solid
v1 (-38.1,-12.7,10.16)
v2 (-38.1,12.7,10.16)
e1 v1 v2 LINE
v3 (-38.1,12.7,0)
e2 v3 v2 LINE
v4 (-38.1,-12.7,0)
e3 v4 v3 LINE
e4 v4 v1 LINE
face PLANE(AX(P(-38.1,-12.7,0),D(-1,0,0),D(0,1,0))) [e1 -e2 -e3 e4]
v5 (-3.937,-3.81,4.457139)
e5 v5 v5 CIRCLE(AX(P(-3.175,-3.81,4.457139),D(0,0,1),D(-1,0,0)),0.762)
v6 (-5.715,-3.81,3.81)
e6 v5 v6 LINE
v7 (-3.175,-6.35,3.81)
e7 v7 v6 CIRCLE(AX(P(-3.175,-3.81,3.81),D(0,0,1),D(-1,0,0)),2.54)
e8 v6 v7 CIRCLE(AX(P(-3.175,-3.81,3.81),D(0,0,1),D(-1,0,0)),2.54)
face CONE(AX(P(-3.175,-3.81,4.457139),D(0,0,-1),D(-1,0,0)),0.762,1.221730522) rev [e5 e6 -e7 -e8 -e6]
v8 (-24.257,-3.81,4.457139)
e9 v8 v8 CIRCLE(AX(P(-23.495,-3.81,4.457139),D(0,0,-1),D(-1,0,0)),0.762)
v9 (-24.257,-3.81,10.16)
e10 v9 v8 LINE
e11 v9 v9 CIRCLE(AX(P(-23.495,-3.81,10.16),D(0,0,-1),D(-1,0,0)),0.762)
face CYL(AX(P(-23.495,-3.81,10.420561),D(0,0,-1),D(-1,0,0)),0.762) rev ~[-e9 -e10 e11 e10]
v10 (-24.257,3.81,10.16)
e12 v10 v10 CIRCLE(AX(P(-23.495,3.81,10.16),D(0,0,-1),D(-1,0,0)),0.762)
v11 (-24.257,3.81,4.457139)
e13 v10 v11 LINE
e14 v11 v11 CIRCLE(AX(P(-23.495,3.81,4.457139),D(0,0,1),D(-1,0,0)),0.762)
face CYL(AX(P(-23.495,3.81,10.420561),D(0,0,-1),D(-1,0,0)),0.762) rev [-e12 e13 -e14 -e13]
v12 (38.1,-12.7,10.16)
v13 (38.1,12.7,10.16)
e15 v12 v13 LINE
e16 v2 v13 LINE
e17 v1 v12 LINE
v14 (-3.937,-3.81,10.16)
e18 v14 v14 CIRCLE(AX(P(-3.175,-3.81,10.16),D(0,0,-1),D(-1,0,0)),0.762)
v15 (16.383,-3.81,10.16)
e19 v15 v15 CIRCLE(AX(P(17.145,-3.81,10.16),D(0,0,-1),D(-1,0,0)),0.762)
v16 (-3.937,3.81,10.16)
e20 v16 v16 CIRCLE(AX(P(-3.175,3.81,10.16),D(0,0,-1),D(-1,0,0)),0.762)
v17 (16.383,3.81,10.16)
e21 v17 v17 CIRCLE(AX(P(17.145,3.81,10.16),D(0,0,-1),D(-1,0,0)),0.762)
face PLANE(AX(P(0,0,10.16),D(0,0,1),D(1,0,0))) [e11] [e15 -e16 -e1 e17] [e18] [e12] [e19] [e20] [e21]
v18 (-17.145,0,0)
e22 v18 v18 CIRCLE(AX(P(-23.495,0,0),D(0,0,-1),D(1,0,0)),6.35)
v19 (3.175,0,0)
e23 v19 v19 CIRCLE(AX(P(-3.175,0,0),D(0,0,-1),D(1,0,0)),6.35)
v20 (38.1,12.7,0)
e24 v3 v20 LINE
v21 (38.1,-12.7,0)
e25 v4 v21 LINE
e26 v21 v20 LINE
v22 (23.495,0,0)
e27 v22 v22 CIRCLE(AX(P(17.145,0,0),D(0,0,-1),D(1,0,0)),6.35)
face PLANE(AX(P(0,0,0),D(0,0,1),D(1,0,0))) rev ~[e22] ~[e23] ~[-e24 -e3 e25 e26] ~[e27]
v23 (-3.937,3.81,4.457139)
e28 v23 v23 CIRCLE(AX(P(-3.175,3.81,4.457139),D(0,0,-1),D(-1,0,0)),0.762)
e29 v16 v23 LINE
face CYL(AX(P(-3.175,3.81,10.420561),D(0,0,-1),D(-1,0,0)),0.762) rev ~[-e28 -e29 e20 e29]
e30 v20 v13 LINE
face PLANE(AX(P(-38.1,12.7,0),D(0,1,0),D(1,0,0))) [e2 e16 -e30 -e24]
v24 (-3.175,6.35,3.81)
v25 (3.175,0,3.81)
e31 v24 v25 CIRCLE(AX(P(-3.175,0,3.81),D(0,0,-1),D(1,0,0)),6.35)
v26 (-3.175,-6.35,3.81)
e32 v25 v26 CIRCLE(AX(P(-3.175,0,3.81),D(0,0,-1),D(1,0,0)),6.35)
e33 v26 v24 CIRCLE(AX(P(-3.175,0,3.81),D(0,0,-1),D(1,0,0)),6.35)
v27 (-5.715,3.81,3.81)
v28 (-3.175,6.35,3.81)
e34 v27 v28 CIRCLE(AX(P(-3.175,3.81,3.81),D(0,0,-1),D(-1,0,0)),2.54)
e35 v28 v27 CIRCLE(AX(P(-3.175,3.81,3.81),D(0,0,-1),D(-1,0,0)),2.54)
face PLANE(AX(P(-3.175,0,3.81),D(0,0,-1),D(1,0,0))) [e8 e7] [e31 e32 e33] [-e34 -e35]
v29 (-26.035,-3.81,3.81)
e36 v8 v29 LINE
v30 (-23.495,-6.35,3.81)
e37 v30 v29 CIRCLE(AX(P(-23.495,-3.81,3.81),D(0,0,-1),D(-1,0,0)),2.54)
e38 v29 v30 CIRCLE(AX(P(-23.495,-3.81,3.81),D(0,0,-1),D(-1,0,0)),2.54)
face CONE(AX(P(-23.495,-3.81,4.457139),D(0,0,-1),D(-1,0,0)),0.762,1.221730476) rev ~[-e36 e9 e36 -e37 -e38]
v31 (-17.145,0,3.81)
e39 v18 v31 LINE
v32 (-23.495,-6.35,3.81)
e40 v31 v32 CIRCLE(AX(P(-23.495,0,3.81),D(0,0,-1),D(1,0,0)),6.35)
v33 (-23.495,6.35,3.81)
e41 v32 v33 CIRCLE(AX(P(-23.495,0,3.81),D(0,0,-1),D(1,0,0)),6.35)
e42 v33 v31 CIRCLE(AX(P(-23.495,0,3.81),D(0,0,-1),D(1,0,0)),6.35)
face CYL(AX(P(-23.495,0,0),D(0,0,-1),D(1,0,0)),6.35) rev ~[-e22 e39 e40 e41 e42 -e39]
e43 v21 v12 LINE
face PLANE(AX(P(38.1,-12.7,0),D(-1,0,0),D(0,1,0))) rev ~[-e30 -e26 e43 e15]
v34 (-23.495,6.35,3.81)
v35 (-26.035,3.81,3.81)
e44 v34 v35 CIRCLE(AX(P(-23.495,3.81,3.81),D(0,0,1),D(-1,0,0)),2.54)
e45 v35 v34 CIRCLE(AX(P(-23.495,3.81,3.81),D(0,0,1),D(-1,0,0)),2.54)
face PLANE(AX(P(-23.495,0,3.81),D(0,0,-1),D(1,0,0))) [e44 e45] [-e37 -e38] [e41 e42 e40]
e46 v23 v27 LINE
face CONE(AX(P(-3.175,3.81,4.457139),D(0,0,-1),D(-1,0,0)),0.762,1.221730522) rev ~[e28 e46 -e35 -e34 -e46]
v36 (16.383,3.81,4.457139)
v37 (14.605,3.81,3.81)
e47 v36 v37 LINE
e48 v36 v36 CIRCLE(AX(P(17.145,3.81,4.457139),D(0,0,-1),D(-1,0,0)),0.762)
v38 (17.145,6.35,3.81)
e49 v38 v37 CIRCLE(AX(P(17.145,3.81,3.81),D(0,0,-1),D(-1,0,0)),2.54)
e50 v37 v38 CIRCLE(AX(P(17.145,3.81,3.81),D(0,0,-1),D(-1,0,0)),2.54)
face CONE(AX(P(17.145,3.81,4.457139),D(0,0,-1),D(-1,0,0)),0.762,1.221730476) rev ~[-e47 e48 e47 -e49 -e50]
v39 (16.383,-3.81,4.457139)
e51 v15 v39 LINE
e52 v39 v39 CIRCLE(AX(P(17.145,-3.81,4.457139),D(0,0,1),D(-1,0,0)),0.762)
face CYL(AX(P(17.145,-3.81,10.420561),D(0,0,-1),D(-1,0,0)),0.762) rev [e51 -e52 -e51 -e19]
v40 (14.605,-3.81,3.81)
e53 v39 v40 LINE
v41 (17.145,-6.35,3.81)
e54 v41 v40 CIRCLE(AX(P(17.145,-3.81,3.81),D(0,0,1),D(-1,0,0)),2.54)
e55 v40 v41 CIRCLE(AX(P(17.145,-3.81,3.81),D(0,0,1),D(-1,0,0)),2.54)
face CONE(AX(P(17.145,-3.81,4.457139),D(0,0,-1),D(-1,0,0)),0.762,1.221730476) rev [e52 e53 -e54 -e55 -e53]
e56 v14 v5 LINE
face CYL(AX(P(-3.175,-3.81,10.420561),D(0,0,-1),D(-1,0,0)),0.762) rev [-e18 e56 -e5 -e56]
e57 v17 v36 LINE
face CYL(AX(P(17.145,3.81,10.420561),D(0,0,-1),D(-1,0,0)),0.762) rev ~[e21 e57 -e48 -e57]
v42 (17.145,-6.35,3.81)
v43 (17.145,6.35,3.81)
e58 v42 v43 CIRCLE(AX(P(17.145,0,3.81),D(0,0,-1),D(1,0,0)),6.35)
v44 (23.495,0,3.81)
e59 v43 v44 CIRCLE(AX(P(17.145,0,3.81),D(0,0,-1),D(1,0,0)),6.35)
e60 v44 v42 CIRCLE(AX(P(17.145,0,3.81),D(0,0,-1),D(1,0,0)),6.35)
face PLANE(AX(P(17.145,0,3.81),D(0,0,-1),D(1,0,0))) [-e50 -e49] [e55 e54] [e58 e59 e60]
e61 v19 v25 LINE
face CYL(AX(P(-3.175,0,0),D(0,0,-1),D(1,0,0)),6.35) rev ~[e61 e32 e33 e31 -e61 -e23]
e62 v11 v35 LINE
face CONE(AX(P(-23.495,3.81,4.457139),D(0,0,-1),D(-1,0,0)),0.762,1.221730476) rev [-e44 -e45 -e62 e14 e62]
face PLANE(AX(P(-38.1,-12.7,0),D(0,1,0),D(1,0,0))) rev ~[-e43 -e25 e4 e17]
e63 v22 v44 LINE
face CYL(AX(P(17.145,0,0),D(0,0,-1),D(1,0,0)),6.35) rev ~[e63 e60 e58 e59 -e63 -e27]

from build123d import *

# Parameters (mm, degrees)
F0_W     = 76.2
F0_H     = 25.4
F1_DEPTH = 10.16
F2_R     = 6.35
F3_DEPTH = 3.81


# Not quite as in the source:
# - a pattern or mirror of a feature is missing from the dataset's text; its kind, count and spacing are read off the source's solid


with BuildPart() as f1:
    # F0 (on Top) → F1 (new body)
    with BuildSketch(Plane.XY):
        Rectangle(F0_W, F0_H)
    extrude(amount=F1_DEPTH)

    # F2 (on face) → F3 (cut)
    with BuildSketch(Plane(origin=(0, 0, 0), x_dir=(1, 0, 0), z_dir=(0, 0, -1))):
        with Locations((-23.495, 0)):
            Circle(F2_R)
        with Locations((-3.175, 0)):
            Circle(F2_R)
        with Locations((17.145, 0)):
            Circle(F2_R)
    extrude(amount=-F3_DEPTH, mode=Mode.SUBTRACT)

    # F5 (on offset) → F6 (revolve, cut)
    with BuildSketch(Plane.XZ.offset(3.81)):
        Polygon((-26.035, 3.81), (-23.495, 3.81), (-23.495, 10.4205608368), (-24.257, 10.4205608368), (-24.257, 4.4571390765), align=None)
    f6 = revolve(axis=Axis((-23.495, -3.81, 7.1152804184), (0, 0, -1)), mode=Mode.SUBTRACT)

    # F6_copies: F6 across plane
    add(f6.mirror(Plane.ZX), mode=Mode.SUBTRACT)

    # F7 (on offset) → F8 (revolve, cut)
    with BuildSketch(Plane.XZ.offset(3.81)):
        Polygon((-5.715, 3.81), (-3.175, 3.81), (-3.175, 10.4205607442), (-3.937, 10.4205607442), (-3.937, 4.4571389839), align=None)
    f8 = revolve(axis=Axis((-3.175, -3.81, 10.0472030926), (0, 0, 1)), mode=Mode.SUBTRACT)

    # F8_copies: F8 across plane
    add(f8.mirror(Plane.ZX), mode=Mode.SUBTRACT)

    # F9 (on offset) → F10 (revolve, cut)
    with BuildSketch(Plane.XZ.offset(3.81)):
        Polygon((14.605, 3.81), (17.145, 3.81), (17.145, 10.4205608368), (16.383, 10.4205608368), (16.383, 4.4571390765), align=None)
    f10 = revolve(axis=Axis((17.145, -3.81, 8.0366932552), (0, 0, 1)), mode=Mode.SUBTRACT)

    # F10_copies: F10 across plane
    add(f10.mirror(Plane.ZX), mode=Mode.SUBTRACT)


solid = f1.part
